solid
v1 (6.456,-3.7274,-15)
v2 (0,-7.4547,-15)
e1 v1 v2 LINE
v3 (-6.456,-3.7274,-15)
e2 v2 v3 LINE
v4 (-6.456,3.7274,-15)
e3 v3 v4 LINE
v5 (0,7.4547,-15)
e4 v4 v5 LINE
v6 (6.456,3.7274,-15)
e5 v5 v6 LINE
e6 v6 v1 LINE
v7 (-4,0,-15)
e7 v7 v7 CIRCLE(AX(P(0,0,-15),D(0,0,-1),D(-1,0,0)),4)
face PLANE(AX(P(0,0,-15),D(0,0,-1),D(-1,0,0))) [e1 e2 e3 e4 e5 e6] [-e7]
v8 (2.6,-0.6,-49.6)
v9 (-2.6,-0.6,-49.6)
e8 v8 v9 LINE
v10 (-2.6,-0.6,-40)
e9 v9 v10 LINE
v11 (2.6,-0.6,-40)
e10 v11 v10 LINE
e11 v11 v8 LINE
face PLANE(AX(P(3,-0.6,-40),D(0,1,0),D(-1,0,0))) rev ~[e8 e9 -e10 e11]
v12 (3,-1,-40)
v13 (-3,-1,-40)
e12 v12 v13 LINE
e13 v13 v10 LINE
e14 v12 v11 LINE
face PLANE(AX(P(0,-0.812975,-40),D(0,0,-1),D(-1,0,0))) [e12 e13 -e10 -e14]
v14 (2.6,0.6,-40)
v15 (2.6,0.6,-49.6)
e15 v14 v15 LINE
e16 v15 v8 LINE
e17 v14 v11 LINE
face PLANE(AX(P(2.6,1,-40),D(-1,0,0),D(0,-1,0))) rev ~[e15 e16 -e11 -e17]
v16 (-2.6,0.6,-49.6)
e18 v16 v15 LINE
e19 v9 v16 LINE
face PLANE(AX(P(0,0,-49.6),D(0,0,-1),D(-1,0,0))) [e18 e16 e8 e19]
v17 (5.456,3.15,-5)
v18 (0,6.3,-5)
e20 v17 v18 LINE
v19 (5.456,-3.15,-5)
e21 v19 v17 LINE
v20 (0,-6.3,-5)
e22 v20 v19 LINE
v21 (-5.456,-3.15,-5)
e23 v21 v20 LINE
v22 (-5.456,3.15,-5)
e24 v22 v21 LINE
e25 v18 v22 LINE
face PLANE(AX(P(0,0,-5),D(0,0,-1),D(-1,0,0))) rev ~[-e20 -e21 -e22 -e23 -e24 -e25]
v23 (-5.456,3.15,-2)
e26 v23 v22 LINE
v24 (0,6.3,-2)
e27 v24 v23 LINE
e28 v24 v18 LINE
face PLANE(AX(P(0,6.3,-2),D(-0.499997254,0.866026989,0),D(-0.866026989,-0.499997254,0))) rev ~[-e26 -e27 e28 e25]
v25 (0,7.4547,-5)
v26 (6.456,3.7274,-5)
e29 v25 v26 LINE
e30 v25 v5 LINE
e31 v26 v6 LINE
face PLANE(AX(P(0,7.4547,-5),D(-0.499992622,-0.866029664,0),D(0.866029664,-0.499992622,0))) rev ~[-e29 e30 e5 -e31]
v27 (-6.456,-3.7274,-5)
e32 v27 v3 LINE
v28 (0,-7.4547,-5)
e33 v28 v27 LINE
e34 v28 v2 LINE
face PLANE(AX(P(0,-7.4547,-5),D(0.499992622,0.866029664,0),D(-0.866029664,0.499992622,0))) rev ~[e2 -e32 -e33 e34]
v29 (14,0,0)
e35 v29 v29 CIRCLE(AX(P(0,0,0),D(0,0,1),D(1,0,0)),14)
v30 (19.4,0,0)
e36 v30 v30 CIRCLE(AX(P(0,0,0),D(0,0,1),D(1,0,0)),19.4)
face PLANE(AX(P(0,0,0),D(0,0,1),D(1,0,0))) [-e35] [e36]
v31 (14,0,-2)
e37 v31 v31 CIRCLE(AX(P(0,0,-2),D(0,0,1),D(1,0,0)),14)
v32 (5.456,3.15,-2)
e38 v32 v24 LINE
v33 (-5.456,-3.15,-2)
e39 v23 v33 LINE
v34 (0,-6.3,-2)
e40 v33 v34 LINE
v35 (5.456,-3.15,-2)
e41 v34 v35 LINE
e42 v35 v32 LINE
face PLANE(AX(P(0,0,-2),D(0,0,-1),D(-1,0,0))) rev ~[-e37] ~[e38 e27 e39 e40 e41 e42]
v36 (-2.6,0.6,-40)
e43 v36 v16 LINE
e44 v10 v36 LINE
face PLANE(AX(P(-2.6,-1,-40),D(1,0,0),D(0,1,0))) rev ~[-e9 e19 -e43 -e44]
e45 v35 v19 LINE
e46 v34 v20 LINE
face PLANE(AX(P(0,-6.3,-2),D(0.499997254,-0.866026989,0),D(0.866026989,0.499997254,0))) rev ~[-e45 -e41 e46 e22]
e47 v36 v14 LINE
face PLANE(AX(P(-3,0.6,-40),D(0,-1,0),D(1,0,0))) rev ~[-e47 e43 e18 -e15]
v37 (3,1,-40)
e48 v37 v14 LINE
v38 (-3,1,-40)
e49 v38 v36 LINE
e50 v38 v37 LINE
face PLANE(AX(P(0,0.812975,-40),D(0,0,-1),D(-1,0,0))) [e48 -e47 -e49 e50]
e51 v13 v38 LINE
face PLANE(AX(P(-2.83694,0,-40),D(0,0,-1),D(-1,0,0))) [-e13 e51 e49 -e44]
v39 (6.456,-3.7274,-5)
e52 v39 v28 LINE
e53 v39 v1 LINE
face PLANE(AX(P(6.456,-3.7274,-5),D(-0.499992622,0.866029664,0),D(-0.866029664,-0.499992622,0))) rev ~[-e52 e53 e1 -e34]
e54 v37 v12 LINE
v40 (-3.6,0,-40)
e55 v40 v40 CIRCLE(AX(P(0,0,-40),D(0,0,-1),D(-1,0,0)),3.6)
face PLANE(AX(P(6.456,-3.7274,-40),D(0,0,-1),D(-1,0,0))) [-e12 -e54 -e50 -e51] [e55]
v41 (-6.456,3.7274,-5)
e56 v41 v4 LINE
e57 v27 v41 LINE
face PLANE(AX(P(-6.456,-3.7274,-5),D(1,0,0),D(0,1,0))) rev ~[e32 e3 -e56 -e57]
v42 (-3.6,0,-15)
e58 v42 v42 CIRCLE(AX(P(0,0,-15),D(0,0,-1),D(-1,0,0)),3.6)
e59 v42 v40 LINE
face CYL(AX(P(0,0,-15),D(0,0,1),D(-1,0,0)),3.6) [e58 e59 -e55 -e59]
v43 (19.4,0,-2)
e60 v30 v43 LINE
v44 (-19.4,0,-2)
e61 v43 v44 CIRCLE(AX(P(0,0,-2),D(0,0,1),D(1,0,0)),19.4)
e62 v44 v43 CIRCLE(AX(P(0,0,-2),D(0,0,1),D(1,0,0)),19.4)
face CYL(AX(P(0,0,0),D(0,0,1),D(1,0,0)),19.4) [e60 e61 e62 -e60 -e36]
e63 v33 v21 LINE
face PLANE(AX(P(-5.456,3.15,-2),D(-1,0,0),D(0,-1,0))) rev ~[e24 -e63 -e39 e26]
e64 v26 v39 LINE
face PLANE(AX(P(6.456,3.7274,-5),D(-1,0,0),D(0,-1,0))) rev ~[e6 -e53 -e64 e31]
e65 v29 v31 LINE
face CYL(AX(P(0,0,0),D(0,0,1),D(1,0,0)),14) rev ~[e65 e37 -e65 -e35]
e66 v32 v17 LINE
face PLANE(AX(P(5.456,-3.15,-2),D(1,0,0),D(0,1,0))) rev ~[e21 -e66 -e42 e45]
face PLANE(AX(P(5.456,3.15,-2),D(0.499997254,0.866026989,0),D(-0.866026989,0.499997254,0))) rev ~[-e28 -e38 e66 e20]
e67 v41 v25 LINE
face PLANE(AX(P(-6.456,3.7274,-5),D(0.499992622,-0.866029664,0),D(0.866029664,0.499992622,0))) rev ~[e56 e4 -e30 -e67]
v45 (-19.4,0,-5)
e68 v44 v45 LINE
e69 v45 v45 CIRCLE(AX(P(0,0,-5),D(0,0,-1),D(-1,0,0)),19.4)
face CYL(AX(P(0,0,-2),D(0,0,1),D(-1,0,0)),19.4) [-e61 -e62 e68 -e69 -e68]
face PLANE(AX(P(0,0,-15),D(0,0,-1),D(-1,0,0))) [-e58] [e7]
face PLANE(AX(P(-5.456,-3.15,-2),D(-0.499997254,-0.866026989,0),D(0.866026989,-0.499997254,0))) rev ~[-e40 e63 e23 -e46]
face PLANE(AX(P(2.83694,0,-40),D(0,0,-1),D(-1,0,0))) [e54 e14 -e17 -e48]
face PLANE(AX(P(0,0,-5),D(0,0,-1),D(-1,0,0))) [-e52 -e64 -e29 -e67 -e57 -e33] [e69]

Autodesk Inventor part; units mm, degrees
sketch "Sketch1" plane through (0, 0, 0) normal (0, 0, 1) x (1, 0, 0)
  circle A0 centre (0, 0) radius 19.4
  circle A1 centre (0, 0) radius 14
  dimension "d0" = 38.8
  dimension "d1" = 28
extrude "Extrusion1" add sketch "Sketch1" against normal blind 2
ref_plane "Work Plane1" through (-19.6075, -25, -15) normal (0, 0, 1) x (1, 0, 0)
ref_plane "Work Plane2" through (-137.3725, -100, -40) normal (0, 0, -1) x (0, 1, 0)
sketch "Sketch5" plane through (0, 0, -2) normal (0, 0, -1) x (-1, 0, 0)
  circle A0 centre (0, 0) radius 19.4 projected
  line L0 (-5.456, -3.15) -> (-5.456, 3.15)
  line L1 (-5.456, 3.15) -> (0, 6.3)
  line L2 (0, 6.3) -> (5.456, 3.15)
  line L3 (5.456, 3.15) -> (5.456, -3.15)
  line L4 (5.456, -3.15) -> (0, -6.3)
  line L5 (0, -6.3) -> (-5.456, -3.15)
  dimension "d14" = 6.3
extrude "Extrusion5" add sketch "Sketch5" along normal blind 3
sketch "Sketch6" plane through (0, 0, -5) normal (0, 0, -1) x (-1, 0, 0)
  circle A0 centre (0, 0) radius 19.4 projected
  line L0 (-5.456, -3.15) -> (-5.456, 3.15) projected
  line L1 (-5.456, 3.15) -> (0, 6.3) projected
  line L2 (0, 6.3) -> (5.456, 3.15) projected
  line L3 (5.456, 3.15) -> (5.456, -3.15) projected
  line L4 (5.456, -3.15) -> (0, -6.3) projected
  line L5 (0, -6.3) -> (-5.456, -3.15) projected
  line L6 (-6.456, 3.7274) -> (-6.456, -3.7274)
  line L7 (-6.456, -3.7274) -> (0, -7.4547)
  line L8 (0, -7.4547) -> (6.456, -3.7274)
  line L9 (6.456, -3.7274) -> (6.456, 3.7274)
  line L10 (6.456, 3.7274) -> (0, 7.4547)
  line L11 (0, 7.4547) -> (-6.456, 3.7274)
  dimension "d17" = 1
ref_plane "Work Plane3" through (-19.6075, -25, -15) normal (0, 0, 1) x (1, 0, 0)
extrude "Extrusion6" add sketch "Sketch6" along normal up to surface (10 mm away) contours L0 L1 L2 L3 L4 L5 | L11 L10 L9 L8 L7 L6
sketch "Sketch7" plane through (6.456, -3.7274, -15) normal (0, 0, -1) x (-1, 0, 0)
  circle A0 centre (6.456, 3.7274) radius 4
  dimension "d20" = 8
ref_plane "Work Plane4" through (-137.3725, -100, -40) normal (0, 0, -1) x (0, 1, 0)
extrude "Extrusion7" add sketch "Sketch7" along normal up to surface (25 mm away)
sketch "Sketch8" plane through (0, 0, -40) normal (0, 0, -1) x (-1, 0, 0)
  line L0 (-3, -1) -> (3, -1)
  line L1 (3, -1) -> (3, 1)
  line L2 (3, 1) -> (-3, 1)
  line L3 (-3, 1) -> (-3, -1)
  line L4 (-3, -1) -> (3, 1) construction
  line L5 (3, -1) -> (-3, 1) construction
  point P0 (0, 0)
  dimension "d23" = 6
  dimension "d24" = 2
extrude "Extrusion8" add sketch "Sketch8" along normal blind 10
thicken "Thicken1" operation cut thickness 0.4 both sides no extend neighbours no toward (0.9870503, 0.1604113, 0) faces at (-3.9482, -0.6416, -31.6667)
thicken "Thicken2" operation cut thickness 0.4 both sides no extend neighbours no toward (1, 0, 0) faces at (-3, -0.3333, -46.6667) (-1, 1, -43.3333) (3, 0.3333, -46.6667) (1, -1, -43.3333) (-1, -0.3333, -50)
properties part number "Reverser_print"
